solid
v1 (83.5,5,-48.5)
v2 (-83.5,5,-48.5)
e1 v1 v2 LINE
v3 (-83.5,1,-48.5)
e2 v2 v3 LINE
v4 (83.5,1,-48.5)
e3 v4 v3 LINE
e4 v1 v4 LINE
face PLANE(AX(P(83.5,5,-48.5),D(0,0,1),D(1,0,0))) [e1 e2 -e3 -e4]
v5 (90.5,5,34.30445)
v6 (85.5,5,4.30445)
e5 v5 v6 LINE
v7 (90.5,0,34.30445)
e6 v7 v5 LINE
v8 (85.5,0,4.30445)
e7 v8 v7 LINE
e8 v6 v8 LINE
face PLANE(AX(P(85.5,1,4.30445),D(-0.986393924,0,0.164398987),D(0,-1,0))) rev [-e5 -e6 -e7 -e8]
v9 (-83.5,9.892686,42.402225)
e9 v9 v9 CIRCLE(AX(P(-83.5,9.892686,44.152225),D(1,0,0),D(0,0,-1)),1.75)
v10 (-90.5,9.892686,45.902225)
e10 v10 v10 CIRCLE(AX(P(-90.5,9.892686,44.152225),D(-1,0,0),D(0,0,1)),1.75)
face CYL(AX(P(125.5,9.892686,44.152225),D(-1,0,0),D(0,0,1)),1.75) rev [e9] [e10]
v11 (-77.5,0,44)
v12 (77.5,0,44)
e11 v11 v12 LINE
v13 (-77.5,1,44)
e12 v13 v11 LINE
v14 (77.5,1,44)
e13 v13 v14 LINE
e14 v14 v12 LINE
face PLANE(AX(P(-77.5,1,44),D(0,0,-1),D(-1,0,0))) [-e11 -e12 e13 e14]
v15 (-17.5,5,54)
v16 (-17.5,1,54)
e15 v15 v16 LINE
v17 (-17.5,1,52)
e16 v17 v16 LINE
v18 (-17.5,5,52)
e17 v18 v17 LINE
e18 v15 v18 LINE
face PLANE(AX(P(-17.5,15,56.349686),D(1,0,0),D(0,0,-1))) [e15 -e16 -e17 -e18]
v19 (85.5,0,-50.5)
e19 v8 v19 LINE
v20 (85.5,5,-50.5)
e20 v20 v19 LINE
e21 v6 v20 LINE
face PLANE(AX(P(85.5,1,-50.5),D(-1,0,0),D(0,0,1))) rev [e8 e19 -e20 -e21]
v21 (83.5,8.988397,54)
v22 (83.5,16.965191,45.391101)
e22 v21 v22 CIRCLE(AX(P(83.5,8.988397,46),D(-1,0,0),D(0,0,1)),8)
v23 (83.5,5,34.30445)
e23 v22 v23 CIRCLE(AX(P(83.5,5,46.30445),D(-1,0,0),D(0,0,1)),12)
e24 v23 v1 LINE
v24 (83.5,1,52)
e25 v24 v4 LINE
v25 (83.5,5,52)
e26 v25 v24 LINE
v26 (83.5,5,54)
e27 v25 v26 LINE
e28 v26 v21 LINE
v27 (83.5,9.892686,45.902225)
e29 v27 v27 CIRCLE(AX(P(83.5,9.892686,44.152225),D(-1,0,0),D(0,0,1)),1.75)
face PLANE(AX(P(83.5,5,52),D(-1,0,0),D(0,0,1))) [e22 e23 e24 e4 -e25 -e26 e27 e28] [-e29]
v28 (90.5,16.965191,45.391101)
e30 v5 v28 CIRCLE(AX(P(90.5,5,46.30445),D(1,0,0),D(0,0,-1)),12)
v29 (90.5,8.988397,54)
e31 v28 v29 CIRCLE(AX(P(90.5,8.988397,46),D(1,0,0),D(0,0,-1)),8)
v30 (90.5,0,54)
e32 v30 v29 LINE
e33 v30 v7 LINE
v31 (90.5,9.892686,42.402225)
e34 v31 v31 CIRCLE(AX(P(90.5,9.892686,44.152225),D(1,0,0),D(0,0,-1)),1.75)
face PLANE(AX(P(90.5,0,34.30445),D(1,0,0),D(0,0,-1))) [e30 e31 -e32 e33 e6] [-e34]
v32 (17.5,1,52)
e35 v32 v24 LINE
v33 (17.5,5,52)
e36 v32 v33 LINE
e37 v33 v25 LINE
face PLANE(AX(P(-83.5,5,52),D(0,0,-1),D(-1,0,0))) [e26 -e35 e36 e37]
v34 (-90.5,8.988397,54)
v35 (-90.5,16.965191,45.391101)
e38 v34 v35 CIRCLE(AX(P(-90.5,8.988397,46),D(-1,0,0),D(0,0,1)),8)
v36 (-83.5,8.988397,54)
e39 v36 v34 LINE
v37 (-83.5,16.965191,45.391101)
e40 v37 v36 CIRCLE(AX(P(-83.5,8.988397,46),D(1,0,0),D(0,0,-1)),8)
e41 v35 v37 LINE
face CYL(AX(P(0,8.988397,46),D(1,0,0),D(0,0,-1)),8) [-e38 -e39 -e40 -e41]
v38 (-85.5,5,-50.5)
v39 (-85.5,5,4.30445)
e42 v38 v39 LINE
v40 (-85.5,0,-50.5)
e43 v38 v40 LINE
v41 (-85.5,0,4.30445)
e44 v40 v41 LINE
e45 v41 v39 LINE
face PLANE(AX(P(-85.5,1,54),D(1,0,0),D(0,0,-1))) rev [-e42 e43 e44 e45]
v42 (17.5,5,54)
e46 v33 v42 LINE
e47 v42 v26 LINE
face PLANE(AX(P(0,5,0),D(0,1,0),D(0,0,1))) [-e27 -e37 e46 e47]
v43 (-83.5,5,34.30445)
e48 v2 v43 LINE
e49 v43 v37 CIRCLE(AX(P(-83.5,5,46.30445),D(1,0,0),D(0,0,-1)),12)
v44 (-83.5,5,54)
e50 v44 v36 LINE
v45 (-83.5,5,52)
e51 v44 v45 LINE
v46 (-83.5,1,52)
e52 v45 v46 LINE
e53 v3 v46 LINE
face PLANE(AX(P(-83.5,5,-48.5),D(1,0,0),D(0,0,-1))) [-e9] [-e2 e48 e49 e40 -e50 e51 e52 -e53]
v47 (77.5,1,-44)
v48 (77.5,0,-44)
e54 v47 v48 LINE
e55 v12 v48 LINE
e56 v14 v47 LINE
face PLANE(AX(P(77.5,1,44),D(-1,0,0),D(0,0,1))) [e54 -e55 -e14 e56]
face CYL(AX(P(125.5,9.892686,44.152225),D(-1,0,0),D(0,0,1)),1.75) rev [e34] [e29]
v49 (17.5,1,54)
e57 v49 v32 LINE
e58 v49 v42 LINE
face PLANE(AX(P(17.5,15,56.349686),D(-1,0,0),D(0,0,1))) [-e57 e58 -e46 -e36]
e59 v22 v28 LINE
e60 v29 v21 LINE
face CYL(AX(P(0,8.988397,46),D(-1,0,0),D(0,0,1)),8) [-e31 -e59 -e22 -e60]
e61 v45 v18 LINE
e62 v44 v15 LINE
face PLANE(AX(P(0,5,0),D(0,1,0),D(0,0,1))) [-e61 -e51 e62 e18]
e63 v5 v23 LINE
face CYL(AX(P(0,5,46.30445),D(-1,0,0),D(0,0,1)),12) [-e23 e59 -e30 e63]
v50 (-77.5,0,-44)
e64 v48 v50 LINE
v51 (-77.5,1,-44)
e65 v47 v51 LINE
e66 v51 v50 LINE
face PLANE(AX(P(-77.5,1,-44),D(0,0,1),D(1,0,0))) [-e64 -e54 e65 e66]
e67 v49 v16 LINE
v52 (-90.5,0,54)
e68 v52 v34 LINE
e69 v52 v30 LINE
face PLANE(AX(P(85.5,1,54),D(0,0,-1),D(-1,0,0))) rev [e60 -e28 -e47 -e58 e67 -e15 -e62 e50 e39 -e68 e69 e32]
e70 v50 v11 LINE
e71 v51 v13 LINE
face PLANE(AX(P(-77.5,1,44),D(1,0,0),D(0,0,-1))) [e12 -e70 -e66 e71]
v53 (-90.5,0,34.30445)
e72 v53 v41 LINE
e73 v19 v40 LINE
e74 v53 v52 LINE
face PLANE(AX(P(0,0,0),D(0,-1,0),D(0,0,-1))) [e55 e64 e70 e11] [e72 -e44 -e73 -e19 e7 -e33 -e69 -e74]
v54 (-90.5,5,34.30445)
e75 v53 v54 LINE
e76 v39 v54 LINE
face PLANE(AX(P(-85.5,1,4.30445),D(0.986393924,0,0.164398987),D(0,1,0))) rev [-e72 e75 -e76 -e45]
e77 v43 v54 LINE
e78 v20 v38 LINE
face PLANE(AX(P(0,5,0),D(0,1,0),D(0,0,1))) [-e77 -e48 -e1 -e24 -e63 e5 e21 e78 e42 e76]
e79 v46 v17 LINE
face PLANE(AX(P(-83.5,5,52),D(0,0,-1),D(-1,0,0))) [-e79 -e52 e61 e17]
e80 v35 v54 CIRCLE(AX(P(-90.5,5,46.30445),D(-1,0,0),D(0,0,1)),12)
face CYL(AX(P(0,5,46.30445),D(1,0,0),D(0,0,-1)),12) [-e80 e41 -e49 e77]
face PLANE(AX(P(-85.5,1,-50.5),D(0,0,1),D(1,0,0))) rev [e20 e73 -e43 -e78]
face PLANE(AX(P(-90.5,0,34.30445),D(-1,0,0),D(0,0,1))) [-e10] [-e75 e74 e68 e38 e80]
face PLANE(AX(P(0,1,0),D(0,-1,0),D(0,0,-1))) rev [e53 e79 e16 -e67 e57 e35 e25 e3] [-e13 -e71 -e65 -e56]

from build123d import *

# Parameters (mm, degrees)
SKETCH1_W                = 171
SKETCH1_H                = 104.5
SKETCH1_W_2              = 155
SKETCH1_H_2              = 88
BOSS_EXTRUDE1_DEPTH      = 1
SKETCH2_W                = 171
SKETCH2_H                = 104.5
SKETCH2_W_2              = 167
SKETCH2_H_2              = 100.5
BOSS_EXTRUDE2_DEPTH      = 4
SKETCH3_W                = 35
SKETCH3_H                = 8.699372258
CUT_EXTRUDE1_DEPTH       = 14
BOSS_EXTRUDE3_DEPTH      = 16
BOSS_EXTRUDE3_DEPTH_BACK = 1
SKETCH4_W                = 7
SKETCH4_H                = 19.695550369
FILLET1_R                = 12
CHAMFER1_SIZE            = 30
CHAMFER1_SIZE_2          = 5
FILLET2_R                = 8
SKETCH5_R                = 1.75
CUT_EXTRUDE2_DEPTH       = 216


with BuildPart() as part:
    # Sketch1 → Boss-Extrude1 (new body)
    with BuildSketch(Plane(origin=(0, 0, 0), x_dir=(1, 0, 0), z_dir=(0, 1, 0))):
        with Locations((0, -1.75)):
            Rectangle(SKETCH1_W, SKETCH1_H)
        Rectangle(SKETCH1_W_2, SKETCH1_H_2, mode=Mode.SUBTRACT)
    extrude(amount=BOSS_EXTRUDE1_DEPTH)

    # Sketch2 → Boss-Extrude2 (add)
    with BuildSketch(Plane(origin=(0, 1, 0), x_dir=(1, 0, 0), z_dir=(0, 1, 0))):
        with Locations((0, -1.75)):
            Rectangle(SKETCH2_W, SKETCH2_H)
        with Locations((0, -1.75)):
            Rectangle(SKETCH2_W_2, SKETCH2_H_2, mode=Mode.SUBTRACT)
    extrude(amount=BOSS_EXTRUDE2_DEPTH)

    # Sketch3 → Cut-Extrude1 (cut)
    with BuildSketch(Plane(origin=(0, 1, 0), x_dir=(1, 0, 0), z_dir=(0, 1, 0))):
        with Locations((0, -52)):
            Rectangle(SKETCH3_W, SKETCH3_H)
    extrude(amount=CUT_EXTRUDE1_DEPTH, mode=Mode.SUBTRACT)

    # Sketch4 → Boss-Extrude3 (add, two sides: drawn at the far end of the back side and taken through both)
    with BuildSketch(Plane(origin=(0, 1, 0), x_dir=(1, 0, 0), z_dir=(0, 1, 0)).offset(-BOSS_EXTRUDE3_DEPTH_BACK)):
        with Locations((-87, -44.152224816)):
            Rectangle(SKETCH4_W, SKETCH4_H)
        with Locations((87, -44.152224816)):
            Rectangle(SKETCH4_W, SKETCH4_H)
    extrude(amount=BOSS_EXTRUDE3_DEPTH + BOSS_EXTRUDE3_DEPTH_BACK)

    # Fillet1
    fillet1_edges = [part.edges().sort_by_distance(p)[0] for p in [
        (87, 17, 34.304449631),
        (-87, 17, 34.304449631),
    ]]
    fillet(fillet1_edges, radius=FILLET1_R)

    # Chamfer1
    # the kernel refuses this chamfer: 30, 5 mm, written as the material it adds along each edge
    with BuildSketch(Plane(origin=(85.5, 5, 34.304449631), x_dir=(-0.006326222023777661, 0, -0.999979989257238), z_dir=(0, -1, 0))) as chamfer1_piece_1_section:
        Polygon((CHAMFER1_SIZE * 0.999979989257, CHAMFER1_SIZE * 0.00632622202378), (-CHAMFER1_SIZE_2 * 0.00632622202378, CHAMFER1_SIZE_2 * 0.999979989257), (0, 0), align=None)
    chamfer1_piece_1 = extrude(amount=5, mode=Mode.PRIVATE)
    chamfer1_piece_1 = split(chamfer1_piece_1, bisect_by=Plane(origin=(90.5, 2.5, 23.467018092), z_dir=(-1, 0, 0)), keep=Keep.TOP, mode=Mode.PRIVATE)
    add(chamfer1_piece_1)
    with BuildSketch(Plane(origin=(-85.5, 0, 34.304449631), x_dir=(0.006326222023777661, 0, -0.999979989257238), z_dir=(0, 1, 0))) as chamfer1_piece_2_section:
        Polygon((CHAMFER1_SIZE * 0.999979989257, CHAMFER1_SIZE * 0.00632622202378), (-CHAMFER1_SIZE_2 * 0.00632622202378, CHAMFER1_SIZE_2 * 0.999979989257), (0, 0), align=None)
    chamfer1_piece_2 = extrude(amount=5, mode=Mode.PRIVATE)
    chamfer1_piece_2 = split(chamfer1_piece_2, bisect_by=Plane(origin=(-90.5, 2.5, 23.467018092), z_dir=(1, 0, 0)), keep=Keep.TOP, mode=Mode.PRIVATE)
    add(chamfer1_piece_2)

    # Fillet2
    fillet2_edges = [part.edges().sort_by_distance(p)[0] for p in [
        (87, 17, 54),
        (-87, 17, 54),
    ]]
    fillet(fillet2_edges, radius=FILLET2_R)

    # Sketch5 → Cut-Extrude2 (cut)
    with BuildSketch(Plane.ZY.offset(90.5)):
        with Locations((44.152224816, 9.892685603)):
            Circle(SKETCH5_R)
    extrude(amount=-CUT_EXTRUDE2_DEPTH, mode=Mode.SUBTRACT)


solid = part.part
